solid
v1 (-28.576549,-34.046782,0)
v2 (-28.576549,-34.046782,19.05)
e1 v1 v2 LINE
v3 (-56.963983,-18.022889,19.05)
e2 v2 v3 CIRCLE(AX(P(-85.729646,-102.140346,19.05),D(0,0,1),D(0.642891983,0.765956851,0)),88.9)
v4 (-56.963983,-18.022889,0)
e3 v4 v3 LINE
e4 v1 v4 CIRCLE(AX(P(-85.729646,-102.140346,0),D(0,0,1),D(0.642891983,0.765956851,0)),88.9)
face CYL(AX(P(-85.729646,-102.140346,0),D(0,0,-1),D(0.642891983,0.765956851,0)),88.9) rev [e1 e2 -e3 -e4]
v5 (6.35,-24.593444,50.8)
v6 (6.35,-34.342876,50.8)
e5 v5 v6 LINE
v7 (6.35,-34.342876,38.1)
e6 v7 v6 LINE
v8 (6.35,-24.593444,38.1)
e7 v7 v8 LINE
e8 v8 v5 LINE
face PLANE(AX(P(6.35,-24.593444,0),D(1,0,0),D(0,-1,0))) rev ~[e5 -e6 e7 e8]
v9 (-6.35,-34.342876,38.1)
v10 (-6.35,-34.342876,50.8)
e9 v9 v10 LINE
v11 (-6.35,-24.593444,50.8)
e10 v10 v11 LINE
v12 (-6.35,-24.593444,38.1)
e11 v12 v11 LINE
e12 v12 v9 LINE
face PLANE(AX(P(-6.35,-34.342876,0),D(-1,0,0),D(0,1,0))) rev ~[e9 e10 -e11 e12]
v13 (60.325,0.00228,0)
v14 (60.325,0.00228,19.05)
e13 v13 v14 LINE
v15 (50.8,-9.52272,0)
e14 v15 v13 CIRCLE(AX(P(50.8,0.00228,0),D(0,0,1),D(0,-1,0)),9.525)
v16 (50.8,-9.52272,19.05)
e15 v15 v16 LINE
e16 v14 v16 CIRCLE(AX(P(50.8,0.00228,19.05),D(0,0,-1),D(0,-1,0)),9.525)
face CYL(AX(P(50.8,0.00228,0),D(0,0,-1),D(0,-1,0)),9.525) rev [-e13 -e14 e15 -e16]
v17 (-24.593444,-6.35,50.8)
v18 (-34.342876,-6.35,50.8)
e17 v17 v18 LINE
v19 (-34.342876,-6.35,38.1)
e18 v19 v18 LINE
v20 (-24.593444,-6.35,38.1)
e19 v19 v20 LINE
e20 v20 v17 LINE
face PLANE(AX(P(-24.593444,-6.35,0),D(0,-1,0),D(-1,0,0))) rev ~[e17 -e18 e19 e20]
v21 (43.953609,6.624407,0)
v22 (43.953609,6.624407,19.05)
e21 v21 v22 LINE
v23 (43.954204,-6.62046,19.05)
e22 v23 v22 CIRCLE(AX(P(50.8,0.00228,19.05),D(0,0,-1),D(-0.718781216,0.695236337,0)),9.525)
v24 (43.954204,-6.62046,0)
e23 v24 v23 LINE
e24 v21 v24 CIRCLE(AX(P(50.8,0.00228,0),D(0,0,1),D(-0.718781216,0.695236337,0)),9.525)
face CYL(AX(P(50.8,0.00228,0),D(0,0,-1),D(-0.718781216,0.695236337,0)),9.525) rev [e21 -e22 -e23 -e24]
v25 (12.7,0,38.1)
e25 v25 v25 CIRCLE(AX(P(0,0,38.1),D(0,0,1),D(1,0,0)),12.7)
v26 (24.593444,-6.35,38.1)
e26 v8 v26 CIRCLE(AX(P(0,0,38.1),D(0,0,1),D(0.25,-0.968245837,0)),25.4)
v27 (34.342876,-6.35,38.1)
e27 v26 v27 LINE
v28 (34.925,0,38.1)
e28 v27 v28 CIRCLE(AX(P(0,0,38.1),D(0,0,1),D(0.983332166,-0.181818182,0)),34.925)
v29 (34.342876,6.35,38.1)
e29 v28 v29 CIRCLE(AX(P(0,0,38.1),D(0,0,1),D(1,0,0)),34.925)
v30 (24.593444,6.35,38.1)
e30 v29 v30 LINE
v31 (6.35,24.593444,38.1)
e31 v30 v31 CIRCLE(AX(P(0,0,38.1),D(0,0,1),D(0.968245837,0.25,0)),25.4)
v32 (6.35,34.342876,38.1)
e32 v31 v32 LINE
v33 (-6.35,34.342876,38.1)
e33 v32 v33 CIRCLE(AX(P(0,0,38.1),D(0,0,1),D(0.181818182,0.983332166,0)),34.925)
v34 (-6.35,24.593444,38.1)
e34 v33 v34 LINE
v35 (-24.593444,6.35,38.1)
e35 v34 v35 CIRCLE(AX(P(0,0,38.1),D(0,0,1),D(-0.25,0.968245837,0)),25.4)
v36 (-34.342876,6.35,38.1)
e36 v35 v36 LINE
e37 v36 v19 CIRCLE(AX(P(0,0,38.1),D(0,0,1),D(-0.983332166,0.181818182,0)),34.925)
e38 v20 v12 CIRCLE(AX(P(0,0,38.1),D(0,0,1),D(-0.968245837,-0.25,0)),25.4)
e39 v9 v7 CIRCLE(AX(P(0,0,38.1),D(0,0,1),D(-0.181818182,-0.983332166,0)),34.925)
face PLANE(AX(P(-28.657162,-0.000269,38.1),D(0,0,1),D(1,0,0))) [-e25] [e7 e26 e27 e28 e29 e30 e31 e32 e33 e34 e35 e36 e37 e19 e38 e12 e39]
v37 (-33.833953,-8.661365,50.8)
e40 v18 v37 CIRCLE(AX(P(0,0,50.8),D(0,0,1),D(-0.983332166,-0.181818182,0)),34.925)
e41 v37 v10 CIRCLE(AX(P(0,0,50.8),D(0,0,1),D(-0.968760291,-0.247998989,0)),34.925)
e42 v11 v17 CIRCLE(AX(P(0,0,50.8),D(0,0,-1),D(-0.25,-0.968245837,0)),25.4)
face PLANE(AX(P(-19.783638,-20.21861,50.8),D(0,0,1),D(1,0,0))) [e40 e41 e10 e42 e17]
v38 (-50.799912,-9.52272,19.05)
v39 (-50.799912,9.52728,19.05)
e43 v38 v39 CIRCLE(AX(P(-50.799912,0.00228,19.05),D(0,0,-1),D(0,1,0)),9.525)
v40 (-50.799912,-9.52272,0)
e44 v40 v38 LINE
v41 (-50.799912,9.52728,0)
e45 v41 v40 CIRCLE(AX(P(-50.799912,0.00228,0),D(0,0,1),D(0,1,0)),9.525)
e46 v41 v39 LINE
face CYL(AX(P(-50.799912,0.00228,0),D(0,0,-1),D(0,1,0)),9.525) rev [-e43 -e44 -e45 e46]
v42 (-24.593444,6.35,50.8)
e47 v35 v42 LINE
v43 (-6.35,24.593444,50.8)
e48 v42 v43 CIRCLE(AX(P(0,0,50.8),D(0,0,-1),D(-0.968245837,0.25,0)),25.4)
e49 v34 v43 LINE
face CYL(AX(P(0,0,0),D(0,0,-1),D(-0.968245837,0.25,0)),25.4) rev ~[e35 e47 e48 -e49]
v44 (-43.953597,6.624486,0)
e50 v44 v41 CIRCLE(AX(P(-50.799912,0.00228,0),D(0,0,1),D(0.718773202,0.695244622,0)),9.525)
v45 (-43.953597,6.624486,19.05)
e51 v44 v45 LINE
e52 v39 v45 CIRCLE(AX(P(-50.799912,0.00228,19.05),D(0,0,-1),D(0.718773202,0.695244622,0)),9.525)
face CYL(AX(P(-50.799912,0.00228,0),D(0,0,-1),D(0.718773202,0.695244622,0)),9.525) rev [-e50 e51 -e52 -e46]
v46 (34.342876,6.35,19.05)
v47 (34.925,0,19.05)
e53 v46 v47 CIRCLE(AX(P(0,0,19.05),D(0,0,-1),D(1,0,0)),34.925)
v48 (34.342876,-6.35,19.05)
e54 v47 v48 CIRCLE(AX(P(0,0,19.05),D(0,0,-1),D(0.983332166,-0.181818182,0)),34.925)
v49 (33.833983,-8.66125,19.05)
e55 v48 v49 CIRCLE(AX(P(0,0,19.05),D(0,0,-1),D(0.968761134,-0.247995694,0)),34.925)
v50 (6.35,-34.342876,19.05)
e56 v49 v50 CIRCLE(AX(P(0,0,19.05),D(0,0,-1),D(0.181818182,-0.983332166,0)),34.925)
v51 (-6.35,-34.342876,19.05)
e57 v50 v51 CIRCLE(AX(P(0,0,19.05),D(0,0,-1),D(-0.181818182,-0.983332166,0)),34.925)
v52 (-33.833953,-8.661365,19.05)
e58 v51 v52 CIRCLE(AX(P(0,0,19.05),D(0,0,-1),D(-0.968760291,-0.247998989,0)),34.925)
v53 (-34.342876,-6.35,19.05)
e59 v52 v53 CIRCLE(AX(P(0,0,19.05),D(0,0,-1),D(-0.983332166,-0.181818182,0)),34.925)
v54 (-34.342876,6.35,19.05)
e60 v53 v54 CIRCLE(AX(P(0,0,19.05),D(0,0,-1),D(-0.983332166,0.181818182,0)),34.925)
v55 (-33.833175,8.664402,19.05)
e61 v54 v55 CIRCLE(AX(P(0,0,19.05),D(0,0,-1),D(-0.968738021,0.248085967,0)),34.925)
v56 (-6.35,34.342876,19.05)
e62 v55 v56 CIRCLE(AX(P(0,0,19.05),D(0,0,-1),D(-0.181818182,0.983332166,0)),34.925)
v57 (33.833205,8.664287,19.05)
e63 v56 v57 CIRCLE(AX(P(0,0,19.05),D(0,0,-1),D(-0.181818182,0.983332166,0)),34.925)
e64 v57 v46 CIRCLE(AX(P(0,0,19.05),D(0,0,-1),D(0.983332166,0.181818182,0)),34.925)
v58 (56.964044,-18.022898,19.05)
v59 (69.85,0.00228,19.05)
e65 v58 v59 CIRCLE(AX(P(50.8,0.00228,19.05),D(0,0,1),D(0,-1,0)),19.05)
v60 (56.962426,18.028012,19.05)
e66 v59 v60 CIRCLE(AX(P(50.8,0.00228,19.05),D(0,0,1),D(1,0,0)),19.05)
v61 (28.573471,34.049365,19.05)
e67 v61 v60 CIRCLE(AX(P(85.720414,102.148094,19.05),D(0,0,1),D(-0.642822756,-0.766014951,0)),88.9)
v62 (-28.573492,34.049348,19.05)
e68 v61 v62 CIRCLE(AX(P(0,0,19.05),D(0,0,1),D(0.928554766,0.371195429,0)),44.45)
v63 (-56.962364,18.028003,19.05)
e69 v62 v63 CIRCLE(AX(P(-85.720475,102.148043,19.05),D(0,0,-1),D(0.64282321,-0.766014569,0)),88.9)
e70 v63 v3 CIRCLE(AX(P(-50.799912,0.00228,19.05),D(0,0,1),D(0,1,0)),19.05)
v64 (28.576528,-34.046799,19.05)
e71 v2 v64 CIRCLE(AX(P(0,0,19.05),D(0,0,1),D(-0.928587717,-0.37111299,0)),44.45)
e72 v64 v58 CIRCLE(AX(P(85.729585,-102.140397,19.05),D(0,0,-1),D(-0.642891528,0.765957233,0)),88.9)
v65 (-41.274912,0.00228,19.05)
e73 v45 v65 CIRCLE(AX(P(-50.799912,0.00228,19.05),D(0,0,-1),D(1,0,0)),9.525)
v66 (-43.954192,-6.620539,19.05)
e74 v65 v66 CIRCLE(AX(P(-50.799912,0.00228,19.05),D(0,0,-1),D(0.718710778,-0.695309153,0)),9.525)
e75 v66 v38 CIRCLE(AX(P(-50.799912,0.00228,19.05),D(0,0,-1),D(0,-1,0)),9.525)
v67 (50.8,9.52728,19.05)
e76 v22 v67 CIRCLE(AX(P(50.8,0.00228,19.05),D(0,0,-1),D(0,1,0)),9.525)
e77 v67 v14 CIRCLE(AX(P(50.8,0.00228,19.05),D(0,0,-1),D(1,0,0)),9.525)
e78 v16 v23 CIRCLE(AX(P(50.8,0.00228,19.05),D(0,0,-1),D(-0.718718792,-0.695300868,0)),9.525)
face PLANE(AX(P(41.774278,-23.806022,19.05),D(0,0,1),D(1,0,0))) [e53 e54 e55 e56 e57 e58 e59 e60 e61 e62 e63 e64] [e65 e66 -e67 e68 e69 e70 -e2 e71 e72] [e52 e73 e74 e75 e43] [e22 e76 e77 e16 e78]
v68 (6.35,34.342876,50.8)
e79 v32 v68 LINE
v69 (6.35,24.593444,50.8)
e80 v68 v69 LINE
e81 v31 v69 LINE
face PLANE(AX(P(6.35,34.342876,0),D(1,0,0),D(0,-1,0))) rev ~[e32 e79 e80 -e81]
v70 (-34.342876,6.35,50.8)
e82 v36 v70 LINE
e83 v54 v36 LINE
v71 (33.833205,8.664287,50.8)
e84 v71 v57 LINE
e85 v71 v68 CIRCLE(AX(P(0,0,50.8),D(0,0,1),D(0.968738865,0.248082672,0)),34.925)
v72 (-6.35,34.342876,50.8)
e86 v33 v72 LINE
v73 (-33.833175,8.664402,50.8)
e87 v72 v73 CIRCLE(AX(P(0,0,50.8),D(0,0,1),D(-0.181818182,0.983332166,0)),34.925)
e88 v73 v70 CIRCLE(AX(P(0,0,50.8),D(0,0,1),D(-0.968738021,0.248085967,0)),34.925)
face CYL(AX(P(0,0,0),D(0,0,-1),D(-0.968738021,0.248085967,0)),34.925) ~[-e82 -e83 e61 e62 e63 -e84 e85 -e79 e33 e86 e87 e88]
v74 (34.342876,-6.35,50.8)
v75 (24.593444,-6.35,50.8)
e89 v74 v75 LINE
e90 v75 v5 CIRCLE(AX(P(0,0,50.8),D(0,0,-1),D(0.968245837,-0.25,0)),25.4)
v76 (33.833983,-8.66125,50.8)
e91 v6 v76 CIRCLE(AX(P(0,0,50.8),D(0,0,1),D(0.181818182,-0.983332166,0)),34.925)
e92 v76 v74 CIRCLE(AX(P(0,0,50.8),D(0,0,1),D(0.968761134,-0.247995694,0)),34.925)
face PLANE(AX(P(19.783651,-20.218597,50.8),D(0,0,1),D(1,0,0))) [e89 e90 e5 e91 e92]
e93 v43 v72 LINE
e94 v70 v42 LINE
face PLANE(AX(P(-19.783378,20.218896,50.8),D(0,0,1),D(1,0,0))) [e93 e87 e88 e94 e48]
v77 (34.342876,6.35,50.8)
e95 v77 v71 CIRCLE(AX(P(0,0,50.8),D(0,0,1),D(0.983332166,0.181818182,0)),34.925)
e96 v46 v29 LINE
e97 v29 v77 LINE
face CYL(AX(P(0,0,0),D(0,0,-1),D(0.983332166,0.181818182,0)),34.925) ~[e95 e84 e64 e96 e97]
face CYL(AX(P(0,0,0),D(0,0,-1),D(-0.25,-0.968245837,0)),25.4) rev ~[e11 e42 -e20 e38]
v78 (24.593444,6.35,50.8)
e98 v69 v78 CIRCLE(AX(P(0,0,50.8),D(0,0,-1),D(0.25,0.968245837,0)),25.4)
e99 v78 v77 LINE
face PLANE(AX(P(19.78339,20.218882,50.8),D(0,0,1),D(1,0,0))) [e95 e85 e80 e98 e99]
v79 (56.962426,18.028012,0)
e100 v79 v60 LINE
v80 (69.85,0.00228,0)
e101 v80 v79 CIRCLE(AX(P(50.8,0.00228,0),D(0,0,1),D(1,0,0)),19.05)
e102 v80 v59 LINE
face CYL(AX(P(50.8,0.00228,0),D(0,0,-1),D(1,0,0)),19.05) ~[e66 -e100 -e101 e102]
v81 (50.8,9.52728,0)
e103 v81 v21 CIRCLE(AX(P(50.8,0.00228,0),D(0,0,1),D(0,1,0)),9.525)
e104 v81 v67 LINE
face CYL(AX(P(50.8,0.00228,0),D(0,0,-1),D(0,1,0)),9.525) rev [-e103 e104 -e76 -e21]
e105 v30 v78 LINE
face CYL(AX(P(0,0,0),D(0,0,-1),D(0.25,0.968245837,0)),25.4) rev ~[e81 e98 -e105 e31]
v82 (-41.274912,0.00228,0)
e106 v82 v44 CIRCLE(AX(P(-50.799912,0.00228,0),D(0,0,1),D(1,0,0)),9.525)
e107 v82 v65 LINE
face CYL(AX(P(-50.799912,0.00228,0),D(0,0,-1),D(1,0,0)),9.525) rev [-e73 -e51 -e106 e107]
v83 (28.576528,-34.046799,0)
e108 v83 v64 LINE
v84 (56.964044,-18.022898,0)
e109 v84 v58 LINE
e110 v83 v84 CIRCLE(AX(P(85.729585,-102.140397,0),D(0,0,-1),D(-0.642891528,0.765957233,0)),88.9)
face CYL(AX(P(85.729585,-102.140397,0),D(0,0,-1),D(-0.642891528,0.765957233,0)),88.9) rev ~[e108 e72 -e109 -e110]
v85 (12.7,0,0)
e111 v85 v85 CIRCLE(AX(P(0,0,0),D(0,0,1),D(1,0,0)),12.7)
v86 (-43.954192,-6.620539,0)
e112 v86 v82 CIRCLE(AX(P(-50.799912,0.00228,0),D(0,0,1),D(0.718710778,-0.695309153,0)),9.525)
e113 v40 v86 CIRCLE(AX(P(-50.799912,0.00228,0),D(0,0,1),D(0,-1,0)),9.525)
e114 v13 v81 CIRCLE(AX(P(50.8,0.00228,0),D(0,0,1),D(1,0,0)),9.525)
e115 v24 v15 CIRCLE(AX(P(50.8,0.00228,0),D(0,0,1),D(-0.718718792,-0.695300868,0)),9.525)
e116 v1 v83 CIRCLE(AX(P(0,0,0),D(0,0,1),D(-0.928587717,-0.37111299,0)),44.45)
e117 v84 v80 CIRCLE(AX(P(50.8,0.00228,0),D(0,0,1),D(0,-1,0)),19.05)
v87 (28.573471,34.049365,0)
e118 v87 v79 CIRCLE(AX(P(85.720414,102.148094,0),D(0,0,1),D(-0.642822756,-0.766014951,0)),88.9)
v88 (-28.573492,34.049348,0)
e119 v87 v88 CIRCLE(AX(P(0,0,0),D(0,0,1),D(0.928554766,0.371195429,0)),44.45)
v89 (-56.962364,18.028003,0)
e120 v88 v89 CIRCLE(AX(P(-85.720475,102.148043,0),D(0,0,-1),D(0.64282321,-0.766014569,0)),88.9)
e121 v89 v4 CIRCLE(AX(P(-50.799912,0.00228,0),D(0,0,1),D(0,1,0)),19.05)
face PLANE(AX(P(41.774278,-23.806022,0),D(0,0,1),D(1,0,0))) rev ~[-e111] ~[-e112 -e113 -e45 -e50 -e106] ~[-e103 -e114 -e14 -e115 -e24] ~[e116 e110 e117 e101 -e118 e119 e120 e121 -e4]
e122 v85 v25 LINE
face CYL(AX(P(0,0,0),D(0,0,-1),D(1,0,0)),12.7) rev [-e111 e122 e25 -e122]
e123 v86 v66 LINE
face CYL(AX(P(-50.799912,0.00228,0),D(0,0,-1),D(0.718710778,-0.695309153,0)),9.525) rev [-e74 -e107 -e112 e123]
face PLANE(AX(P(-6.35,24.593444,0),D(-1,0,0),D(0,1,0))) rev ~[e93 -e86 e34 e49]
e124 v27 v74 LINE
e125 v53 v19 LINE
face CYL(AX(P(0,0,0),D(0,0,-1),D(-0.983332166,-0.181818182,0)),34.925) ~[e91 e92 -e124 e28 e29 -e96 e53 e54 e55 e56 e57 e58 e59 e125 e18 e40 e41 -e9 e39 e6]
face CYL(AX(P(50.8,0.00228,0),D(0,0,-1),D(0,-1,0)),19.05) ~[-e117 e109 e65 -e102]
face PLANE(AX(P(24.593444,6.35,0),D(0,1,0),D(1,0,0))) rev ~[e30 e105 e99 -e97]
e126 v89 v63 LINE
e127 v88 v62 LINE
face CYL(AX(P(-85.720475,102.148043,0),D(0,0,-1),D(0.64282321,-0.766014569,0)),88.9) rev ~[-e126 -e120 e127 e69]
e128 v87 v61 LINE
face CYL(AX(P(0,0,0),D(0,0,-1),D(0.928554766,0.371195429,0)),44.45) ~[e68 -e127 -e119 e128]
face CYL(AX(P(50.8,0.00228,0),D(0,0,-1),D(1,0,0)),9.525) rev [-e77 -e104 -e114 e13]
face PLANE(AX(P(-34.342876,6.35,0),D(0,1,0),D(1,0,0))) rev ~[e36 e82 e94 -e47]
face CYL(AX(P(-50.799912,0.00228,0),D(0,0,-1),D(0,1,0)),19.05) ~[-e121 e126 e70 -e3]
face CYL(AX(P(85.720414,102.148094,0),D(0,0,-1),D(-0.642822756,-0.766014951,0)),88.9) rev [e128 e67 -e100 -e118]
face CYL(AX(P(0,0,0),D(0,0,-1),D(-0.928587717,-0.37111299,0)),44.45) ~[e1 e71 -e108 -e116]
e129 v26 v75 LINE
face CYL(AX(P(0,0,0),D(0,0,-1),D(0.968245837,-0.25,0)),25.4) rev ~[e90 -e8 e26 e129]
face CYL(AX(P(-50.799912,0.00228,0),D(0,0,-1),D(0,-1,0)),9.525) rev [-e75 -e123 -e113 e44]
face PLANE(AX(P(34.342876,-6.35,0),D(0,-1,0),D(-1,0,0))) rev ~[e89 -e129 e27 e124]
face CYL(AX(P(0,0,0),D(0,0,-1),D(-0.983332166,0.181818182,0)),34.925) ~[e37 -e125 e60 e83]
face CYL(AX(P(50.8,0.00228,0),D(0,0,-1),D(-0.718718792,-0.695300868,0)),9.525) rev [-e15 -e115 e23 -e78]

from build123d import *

# Parameters (mm, degrees)
F0_R        = 12.7
F1_DEPTH    = 19.05
F2_DEPTH    = 38.1
F3_DEPTH    = 50.8
F4_T1_DEPTH = 19.05
F5_DEPTH    = 25.4


# Not quite as in the source:
# - a fillet or chamfer that OpenCascade refuses, or shapes differently, is made with other operations: its cross-section is extruded or revolved along the edge and cut away or added


with BuildPart() as f1:
    # F0 (on Top) → F1 (new body)
    with BuildSketch(Plane.XY):
        with BuildLine():
            ThreePointArc((-50.7999117786, -19.0477195084), (-45.869861945, -18.3987278677), (-41.2757240411, -16.4959723838))
            ThreePointArc((-41.2757240411, -16.4959723838), (-42.9000661545, -11.6355843833), (-43.9541916189, -6.620539187))
            ThreePointArc((-43.9541916189, -6.620539187), (-47.0821659857, -8.7672115815), (-50.7999117786, -9.5227195084))
            Line((-50.7999117786, -9.5227195084), (-50.7999117786, -19.0477195084))
        make_face()
        with BuildLine():
            ThreePointArc((33.8339826183, -8.661249632), (23.8448022993, -25.5182489271), (6.35, -34.3428758988))
            ThreePointArc((6.35, -34.3428758988), (0, -34.925), (-6.35, -34.3428758988))
            ThreePointArc((-6.35, -34.3428758988), (-23.8447589032, -25.5182894774), (-33.8339531596, -8.6613647075))
            ThreePointArc((-33.8339531596, -8.6613647075), (-36.9876986012, -13.1173714527), (-41.2757240411, -16.4959723838))
            ThreePointArc((-41.2757240411, -16.4959723838), (2.22821e-05, -44.45), (41.2757405794, -16.495931002))
            ThreePointArc((41.2757405794, -16.495931002), (36.9877138276, -13.1172946041), (33.8339826183, -8.661249632))
        make_face()
        with BuildLine():
            ThreePointArc((6.35, 24.5934442484), (17.9605122421, 17.9605122421), (24.5934442484, 6.35))
            Line((24.5934442484, 6.35), (32.8386816452, 6.35))
            ThreePointArc((32.8386816452, 6.35), (33.2976498796, 7.5235995423), (33.8332048478, 8.6642873181))
            ThreePointArc((33.8332048478, 8.6642873181), (23.8436567211, 25.519319332), (6.35, 34.3428758988))
            Line((6.35, 34.3428758988), (6.35, 24.5934442484))
        make_face()
        with BuildLine():
            ThreePointArc((50.8, 19.0522804916), (45.8690841465, 18.4030568025), (41.2742593566, 16.4996368009))
            ThreePointArc((41.2742593566, 16.4996368009), (42.8990375845, 11.6393760281), (43.9536089212, 6.6244066))
            ThreePointArc((43.9536089212, 6.6244066), (47.0818099956, 8.771584232), (50.8, 9.5272804916))
            Line((50.8, 9.5272804916), (50.8, 19.0522804916))
        make_face()
        with BuildLine():
            ThreePointArc((-43.953597028, 6.6244855122), (-42.8990213005, 11.6394360455), (-41.274242812, 16.4996781876))
            ThreePointArc((-41.274242812, 16.4996781876), (-45.8690358984, 18.4030675143), (-50.7999117786, 19.0522804916))
            Line((-50.7999117786, 19.0522804916), (-50.7999117786, 9.5272804916))
            ThreePointArc((-50.7999117786, 9.5272804916), (-47.0817723125, 8.7716056601), (-43.953597028, 6.6244855122))
        make_face()
        with BuildLine():
            ThreePointArc((-24.5934442484, -6.35), (-25.4, 0), (-24.5934442484, 6.35))
            Line((-24.5934442484, 6.35), (-32.8385934238, 6.35))
            ThreePointArc((-32.8385934238, 6.35), (-32.0240547455, 3.2224812106), (-31.7499117786, 0.0022804916))
            ThreePointArc((-31.7499117786, 0.0022804916), (-32.0244637739, -3.2203042194), (-32.8402059749, -6.35))
            Line((-32.8402059749, -6.35), (-24.5934442484, -6.35))
        make_face()
        with BuildLine():
            ThreePointArc((-34.3428758988, 6.35), (-34.1076619913, 7.5115257095), (-33.8331753774, 8.6644023962))
            ThreePointArc((-33.8331753774, 8.6644023962), (-36.9865207313, 13.1206922771), (-41.274242812, 16.4996781876))
            ThreePointArc((-41.274242812, 16.4996781876), (-42.8990213005, 11.6394360455), (-43.953597028, 6.6244855122))
            ThreePointArc((-43.953597028, 6.6244855122), (-41.9699408557, 3.5740081548), (-41.2749117786, 0.0022804916))
            ThreePointArc((-41.2749117786, 0.0022804916), (-41.9701012053, -3.5698435599), (-43.9541916189, -6.620539187))
            ThreePointArc((-43.9541916189, -6.620539187), (-42.9000661545, -11.6355843833), (-41.2757240411, -16.4959723838))
            ThreePointArc((-41.2757240411, -16.4959723838), (-36.9876986012, -13.1173714527), (-33.8339531596, -8.6613647075))
            ThreePointArc((-33.8339531596, -8.6613647075), (-34.1079991617, -7.5099945529), (-34.3428758988, -6.35))
            ThreePointArc((-34.3428758988, -6.35), (-34.925, 0), (-34.3428758988, 6.35))
        make_face()
        with BuildLine():
            ThreePointArc((-43.9541916189, -6.620539187), (-44.4499999552, 0.0019954336), (-43.953597028, 6.6244855122))
            ThreePointArc((-43.953597028, 6.6244855122), (-47.0817723125, 8.7716056601), (-50.7999117786, 9.5272804916))
            Line((-50.7999117786, 9.5272804916), (-50.7999117786, -9.5227195084))
            ThreePointArc((-50.7999117786, -9.5227195084), (-47.0821659857, -8.7672115815), (-43.9541916189, -6.620539187))
        make_face()
        with BuildLine():
            ThreePointArc((-41.2749117786, 0.0022804916), (-41.9699408557, 3.5740081548), (-43.953597028, 6.6244855122))
            ThreePointArc((-43.953597028, 6.6244855122), (-44.4499999552, 0.0019954336), (-43.9541916189, -6.620539187))
            ThreePointArc((-43.9541916189, -6.620539187), (-41.9701012053, -3.5698435599), (-41.2749117786, 0.0022804916))
        make_face()
        with BuildLine():
            Line((34.3428758988, 6.35), (32.8386816452, 6.35))
            ThreePointArc((32.8386816452, 6.35), (31.7500001536, -0.000138335), (32.8402941963, -6.35))
            Line((32.8402941963, -6.35), (34.3428758988, -6.35))
            ThreePointArc((34.3428758988, -6.35), (34.7791644937, -3.1883133656), (34.925, 0))
            ThreePointArc((34.925, 0), (34.7791644937, 3.1883133656), (34.3428758988, 6.35))
        make_face()
        with BuildLine():
            ThreePointArc((24.5934442484, -6.35), (25.1975542852, -3.2005090291), (25.4, 0))
            ThreePointArc((25.4, 0), (25.1975542852, 3.2005090291), (24.5934442484, 6.35))
            ThreePointArc((24.5934442484, 6.35), (17.9605122421, 17.9605122421), (6.35, 24.5934442484))
            ThreePointArc((6.35, 24.5934442484), (0, 25.4), (-6.35, 24.5934442484))
            ThreePointArc((-6.35, 24.5934442484), (-17.9605122421, 17.9605122421), (-24.5934442484, 6.35))
            ThreePointArc((-24.5934442484, 6.35), (-25.4, 0), (-24.5934442484, -6.35))
            ThreePointArc((-24.5934442484, -6.35), (-17.9605122421, -17.9605122421), (-6.35, -24.5934442484))
            ThreePointArc((-6.35, -24.5934442484), (0, -25.4), (6.35, -24.5934442484))
            ThreePointArc((6.35, -24.5934442484), (17.9605122421, -17.9605122421), (24.5934442484, -6.35))
        make_face()
        Circle(F0_R, mode=Mode.SUBTRACT)
        with BuildLine():
            Line((6.35, -34.3428758988), (6.35, -24.5934442484))
            ThreePointArc((6.35, -24.5934442484), (0, -25.4), (-6.35, -24.5934442484))
            Line((-6.35, -24.5934442484), (-6.35, -34.3428758988))
            ThreePointArc((-6.35, -34.3428758988), (0, -34.925), (6.35, -34.3428758988))
        make_face()
        with BuildLine():
            ThreePointArc((-6.35, 24.5934442484), (0, 25.4), (6.35, 24.5934442484))
            Line((6.35, 24.5934442484), (6.35, 34.3428758988))
            ThreePointArc((6.35, 34.3428758988), (0, 34.925), (-6.35, 34.3428758988))
            Line((-6.35, 34.3428758988), (-6.35, 24.5934442484))
        make_face()
        with BuildLine():
            ThreePointArc((69.85, 0.0022804916), (64.2703841816, 13.4726646732), (50.8, 19.0522804916))
            Line((50.8, 19.0522804916), (50.8, 9.5272804916))
            ThreePointArc((50.8, 9.5272804916), (57.5351920908, 6.7374725824), (60.325, 0.0022804916))
            ThreePointArc((60.325, 0.0022804916), (57.5351920908, -6.7329115992), (50.8, -9.5227195084))
            Line((50.8, -9.5227195084), (50.8, -19.0477195084))
            ThreePointArc((50.8, -19.0477195084), (64.2703841816, -13.46810369), (69.85, 0.0022804916))
        make_face()
        with BuildLine():
            ThreePointArc((-24.5934442484, 6.35), (-17.9605122421, 17.9605122421), (-6.35, 24.5934442484))
            Line((-6.35, 24.5934442484), (-6.35, 34.3428758988))
            ThreePointArc((-6.35, 34.3428758988), (-23.8436133211, 25.5193598821), (-33.8331753774, 8.6644023962))
            ThreePointArc((-33.8331753774, 8.6644023962), (-33.2975871652, 7.5236588976), (-32.8385934238, 6.35))
            Line((-32.8385934238, 6.35), (-24.5934442484, 6.35))
        make_face()
        with BuildLine():
            Line((-6.35, -34.3428758988), (-6.35, -24.5934442484))
            ThreePointArc((-6.35, -24.5934442484), (-17.9605122421, -17.9605122421), (-24.5934442484, -6.35))
            Line((-24.5934442484, -6.35), (-32.8402059749, -6.35))
            ThreePointArc((-32.8402059749, -6.35), (-33.2988800792, -7.5221058258), (-33.8339531596, -8.6613647075))
            ThreePointArc((-33.8339531596, -8.6613647075), (-23.8447589032, -25.5182894774), (-6.35, -34.3428758988))
        make_face()
        with BuildLine():
            Line((-50.7999117786, -9.5227195084), (-50.7999117786, 9.5272804916))
            ThreePointArc((-50.7999117786, 9.5272804916), (-60.3249117786, 0.0022804916), (-50.7999117786, -9.5227195084))
        make_face()
        with BuildLine():
            Line((-50.7999117786, 9.5272804916), (-50.7999117786, 19.0522804916))
            ThreePointArc((-50.7999117786, 19.0522804916), (-69.8499117786, 0.0022804916), (-50.7999117786, -19.0477195084))
            Line((-50.7999117786, -19.0477195084), (-50.7999117786, -9.5227195084))
            ThreePointArc((-50.7999117786, -9.5227195084), (-60.3249117786, 0.0022804916), (-50.7999117786, 9.5272804916))
        make_face()
        with BuildLine():
            ThreePointArc((-31.7499117786, 0.0022804916), (-32.0240547455, 3.2224812106), (-32.8385934238, 6.35))
            Line((-32.8385934238, 6.35), (-34.3428758988, 6.35))
            ThreePointArc((-34.3428758988, 6.35), (-34.925, 0), (-34.3428758988, -6.35))
            Line((-34.3428758988, -6.35), (-32.8402059749, -6.35))
            ThreePointArc((-32.8402059749, -6.35), (-32.0244637739, -3.2203042194), (-31.7499117786, 0.0022804916))
        make_face()
        with BuildLine():
            ThreePointArc((44.45, 0), (44.3257285137, 3.3214893838), (43.9536089212, 6.6244066))
            ThreePointArc((43.9536089212, 6.6244066), (41.2750000096, 0.0018528994), (43.954203504, -6.6204602806))
            ThreePointArc((43.954203504, -6.6204602806), (44.3258775759, -3.319499529), (44.45, 0))
        make_face()
        with BuildLine():
            ThreePointArc((-6.35, 34.3428758988), (0, 34.925), (6.35, 34.3428758988))
            ThreePointArc((6.35, 34.3428758988), (23.8436567211, 25.519319332), (33.8332048478, 8.6642873181))
            ThreePointArc((33.8332048478, 8.6642873181), (36.9865359667, 13.1206154241), (41.2742593566, 16.4996368009))
            ThreePointArc((41.2742593566, 16.4996368009), (2.22855e-05, 44.45), (-41.274242812, 16.4996781876))
            ThreePointArc((-41.274242812, 16.4996781876), (-36.9865207313, 13.1206922771), (-33.8331753774, 8.6644023962))
            ThreePointArc((-33.8331753774, 8.6644023962), (-23.8436133211, 25.5193598821), (-6.35, 34.3428758988))
        make_face()
        with BuildLine():
            ThreePointArc((50.8, 9.5272804916), (47.0818099956, 8.771584232), (43.9536089212, 6.6244066))
            ThreePointArc((43.9536089212, 6.6244066), (44.3257285137, 3.3214893838), (44.45, 0))
            ThreePointArc((44.45, 0), (44.3258775759, -3.319499529), (43.954203504, -6.6204602806))
            ThreePointArc((43.954203504, -6.6204602806), (47.0822036672, -8.7671901554), (50.8, -9.5227195084))
            Line((50.8, -9.5227195084), (50.8, 9.5272804916))
        make_face()
        with BuildLine():
            ThreePointArc((60.325, 0.0022804916), (57.5351920908, 6.7374725824), (50.8, 9.5272804916))
            Line((50.8, 9.5272804916), (50.8, -9.5227195084))
            ThreePointArc((50.8, -9.5227195084), (57.5351920908, -6.7329115992), (60.325, 0.0022804916))
        make_face()
        with BuildLine():
            ThreePointArc((43.954203504, -6.6204602806), (42.9000824312, -11.6355243712), (41.2757405794, -16.495931002))
            ThreePointArc((41.2757405794, -16.495931002), (45.8699101912, -18.3987171574), (50.8, -19.0477195084))
            Line((50.8, -19.0477195084), (50.8, -9.5227195084))
            ThreePointArc((50.8, -9.5227195084), (47.0822036672, -8.7671901554), (43.954203504, -6.6204602806))
        make_face()
        with BuildLine():
            ThreePointArc((24.5934442484, 6.35), (25.1975542852, 3.2005090291), (25.4, 0))
            ThreePointArc((25.4, 0), (25.1975542852, -3.2005090291), (24.5934442484, -6.35))
            Line((24.5934442484, -6.35), (32.8402941963, -6.35))
            ThreePointArc((32.8402941963, -6.35), (31.7500001536, -0.000138335), (32.8386816452, 6.35))
            Line((32.8386816452, 6.35), (24.5934442484, 6.35))
        make_face()
        with BuildLine():
            ThreePointArc((33.8332048478, 8.6642873181), (34.1076747659, 7.5114677036), (34.3428758988, 6.35))
            ThreePointArc((34.3428758988, 6.35), (34.7791644937, 3.1883133656), (34.925, 0))
            ThreePointArc((34.925, 0), (34.7791644937, -3.1883133656), (34.3428758988, -6.35))
            ThreePointArc((34.3428758988, -6.35), (34.1080119331, -7.5099365491), (33.8339826183, -8.661249632))
            ThreePointArc((33.8339826183, -8.661249632), (36.9877138276, -13.1172946041), (41.2757405794, -16.495931002))
            ThreePointArc((41.2757405794, -16.495931002), (42.9000824312, -11.6355243712), (43.954203504, -6.6204602806))
            ThreePointArc((43.954203504, -6.6204602806), (41.2750000096, 0.0018528994), (43.9536089212, 6.6244066))
            ThreePointArc((43.9536089212, 6.6244066), (42.8990375845, 11.6393760281), (41.2742593566, 16.4996368009))
            ThreePointArc((41.2742593566, 16.4996368009), (36.9865359667, 13.1206154241), (33.8332048478, 8.6642873181))
        make_face()
        with BuildLine():
            Line((32.8402941963, -6.35), (24.5934442484, -6.35))
            ThreePointArc((24.5934442484, -6.35), (17.9605122421, -17.9605122421), (6.35, -24.5934442484))
            Line((6.35, -24.5934442484), (6.35, -34.3428758988))
            ThreePointArc((6.35, -34.3428758988), (23.8448022993, -25.5182489271), (33.8339826183, -8.661249632))
            ThreePointArc((33.8339826183, -8.661249632), (33.2989427827, -7.5220464735), (32.8402941963, -6.35))
        make_face()
        with BuildLine():
            ThreePointArc((-33.8339531596, -8.6613647075), (-33.2988800792, -7.5221058258), (-32.8402059749, -6.35))
            Line((-32.8402059749, -6.35), (-34.3428758988, -6.35))
            ThreePointArc((-34.3428758988, -6.35), (-34.1079991617, -7.5099945529), (-33.8339531596, -8.6613647075))
        make_face()
        with BuildLine():
            ThreePointArc((33.8332048478, 8.6642873181), (33.2976498796, 7.5235995423), (32.8386816452, 6.35))
            Line((32.8386816452, 6.35), (34.3428758988, 6.35))
            ThreePointArc((34.3428758988, 6.35), (34.1076747659, 7.5114677036), (33.8332048478, 8.6642873181))
        make_face()
        with BuildLine():
            Line((34.3428758988, -6.35), (32.8402941963, -6.35))
            ThreePointArc((32.8402941963, -6.35), (33.2989427827, -7.5220464735), (33.8339826183, -8.661249632))
            ThreePointArc((33.8339826183, -8.661249632), (34.1080119331, -7.5099365491), (34.3428758988, -6.35))
        make_face()
        with BuildLine():
            Line((-34.3428758988, 6.35), (-32.8385934238, 6.35))
            ThreePointArc((-32.8385934238, 6.35), (-33.2975871652, 7.5236588976), (-33.8331753774, 8.6644023962))
            ThreePointArc((-33.8331753774, 8.6644023962), (-34.1076619913, 7.5115257095), (-34.3428758988, 6.35))
        make_face()
    extrude(amount=F1_DEPTH)

    # F0 (on Top) → F2 (join)
    with BuildSketch(Plane.XY):
        with BuildLine():
            ThreePointArc((-24.5934442484, -6.35), (-25.4, 0), (-24.5934442484, 6.35))
            Line((-24.5934442484, 6.35), (-32.8385934238, 6.35))
            ThreePointArc((-32.8385934238, 6.35), (-32.0240547455, 3.2224812106), (-31.7499117786, 0.0022804916))
            ThreePointArc((-31.7499117786, 0.0022804916), (-32.0244637739, -3.2203042194), (-32.8402059749, -6.35))
            Line((-32.8402059749, -6.35), (-24.5934442484, -6.35))
        make_face()
        with BuildLine():
            ThreePointArc((-31.7499117786, 0.0022804916), (-32.0240547455, 3.2224812106), (-32.8385934238, 6.35))
            Line((-32.8385934238, 6.35), (-34.3428758988, 6.35))
            ThreePointArc((-34.3428758988, 6.35), (-34.925, 0), (-34.3428758988, -6.35))
            Line((-34.3428758988, -6.35), (-32.8402059749, -6.35))
            ThreePointArc((-32.8402059749, -6.35), (-32.0244637739, -3.2203042194), (-31.7499117786, 0.0022804916))
        make_face()
        with BuildLine():
            Line((6.35, -34.3428758988), (6.35, -24.5934442484))
            ThreePointArc((6.35, -24.5934442484), (0, -25.4), (-6.35, -24.5934442484))
            Line((-6.35, -24.5934442484), (-6.35, -34.3428758988))
            ThreePointArc((-6.35, -34.3428758988), (0, -34.925), (6.35, -34.3428758988))
        make_face()
        with BuildLine():
            ThreePointArc((-6.35, 24.5934442484), (0, 25.4), (6.35, 24.5934442484))
            Line((6.35, 24.5934442484), (6.35, 34.3428758988))
            ThreePointArc((6.35, 34.3428758988), (0, 34.925), (-6.35, 34.3428758988))
            Line((-6.35, 34.3428758988), (-6.35, 24.5934442484))
        make_face()
        with BuildLine():
            ThreePointArc((24.5934442484, 6.35), (25.1975542852, 3.2005090291), (25.4, 0))
            ThreePointArc((25.4, 0), (25.1975542852, -3.2005090291), (24.5934442484, -6.35))
            Line((24.5934442484, -6.35), (32.8402941963, -6.35))
            ThreePointArc((32.8402941963, -6.35), (31.7500001536, -0.000138335), (32.8386816452, 6.35))
            Line((32.8386816452, 6.35), (24.5934442484, 6.35))
        make_face()
        with BuildLine():
            Line((34.3428758988, 6.35), (32.8386816452, 6.35))
            ThreePointArc((32.8386816452, 6.35), (31.7500001536, -0.000138335), (32.8402941963, -6.35))
            Line((32.8402941963, -6.35), (34.3428758988, -6.35))
            ThreePointArc((34.3428758988, -6.35), (34.7791644937, -3.1883133656), (34.925, 0))
            ThreePointArc((34.925, 0), (34.7791644937, 3.1883133656), (34.3428758988, 6.35))
        make_face()
        with BuildLine():
            ThreePointArc((24.5934442484, -6.35), (25.1975542852, -3.2005090291), (25.4, 0))
            ThreePointArc((25.4, 0), (25.1975542852, 3.2005090291), (24.5934442484, 6.35))
            ThreePointArc((24.5934442484, 6.35), (17.9605122421, 17.9605122421), (6.35, 24.5934442484))
            ThreePointArc((6.35, 24.5934442484), (0, 25.4), (-6.35, 24.5934442484))
            ThreePointArc((-6.35, 24.5934442484), (-17.9605122421, 17.9605122421), (-24.5934442484, 6.35))
            ThreePointArc((-24.5934442484, 6.35), (-25.4, 0), (-24.5934442484, -6.35))
            ThreePointArc((-24.5934442484, -6.35), (-17.9605122421, -17.9605122421), (-6.35, -24.5934442484))
            ThreePointArc((-6.35, -24.5934442484), (0, -25.4), (6.35, -24.5934442484))
            ThreePointArc((6.35, -24.5934442484), (17.9605122421, -17.9605122421), (24.5934442484, -6.35))
        make_face()
        Circle(F0_R, mode=Mode.SUBTRACT)
        with BuildLine():
            ThreePointArc((33.8332048478, 8.6642873181), (33.2976498796, 7.5235995423), (32.8386816452, 6.35))
            Line((32.8386816452, 6.35), (34.3428758988, 6.35))
            ThreePointArc((34.3428758988, 6.35), (34.1076747659, 7.5114677036), (33.8332048478, 8.6642873181))
        make_face()
        with BuildLine():
            Line((34.3428758988, -6.35), (32.8402941963, -6.35))
            ThreePointArc((32.8402941963, -6.35), (33.2989427827, -7.5220464735), (33.8339826183, -8.661249632))
            ThreePointArc((33.8339826183, -8.661249632), (34.1080119331, -7.5099365491), (34.3428758988, -6.35))
        make_face()
        with BuildLine():
            ThreePointArc((-33.8339531596, -8.6613647075), (-33.2988800792, -7.5221058258), (-32.8402059749, -6.35))
            Line((-32.8402059749, -6.35), (-34.3428758988, -6.35))
            ThreePointArc((-34.3428758988, -6.35), (-34.1079991617, -7.5099945529), (-33.8339531596, -8.6613647075))
        make_face()
        with BuildLine():
            Line((-34.3428758988, 6.35), (-32.8385934238, 6.35))
            ThreePointArc((-32.8385934238, 6.35), (-33.2975871652, 7.5236588976), (-33.8331753774, 8.6644023962))
            ThreePointArc((-33.8331753774, 8.6644023962), (-34.1076619913, 7.5115257095), (-34.3428758988, 6.35))
        make_face()
    extrude(amount=F2_DEPTH)

    # F0 (on Top) → F3 (join)
    with BuildSketch(Plane.XY):
        with BuildLine():
            Line((-6.35, -34.3428758988), (-6.35, -24.5934442484))
            ThreePointArc((-6.35, -24.5934442484), (-17.9605122421, -17.9605122421), (-24.5934442484, -6.35))
            Line((-24.5934442484, -6.35), (-32.8402059749, -6.35))
            ThreePointArc((-32.8402059749, -6.35), (-33.2988800792, -7.5221058258), (-33.8339531596, -8.6613647075))
            ThreePointArc((-33.8339531596, -8.6613647075), (-23.8447589032, -25.5182894774), (-6.35, -34.3428758988))
        make_face()
        with BuildLine():
            Line((32.8402941963, -6.35), (24.5934442484, -6.35))
            ThreePointArc((24.5934442484, -6.35), (17.9605122421, -17.9605122421), (6.35, -24.5934442484))
            Line((6.35, -24.5934442484), (6.35, -34.3428758988))
            ThreePointArc((6.35, -34.3428758988), (23.8448022993, -25.5182489271), (33.8339826183, -8.661249632))
            ThreePointArc((33.8339826183, -8.661249632), (33.2989427827, -7.5220464735), (32.8402941963, -6.35))
        make_face()
        with BuildLine():
            ThreePointArc((6.35, 24.5934442484), (17.9605122421, 17.9605122421), (24.5934442484, 6.35))
            Line((24.5934442484, 6.35), (32.8386816452, 6.35))
            ThreePointArc((32.8386816452, 6.35), (33.2976498796, 7.5235995423), (33.8332048478, 8.6642873181))
            ThreePointArc((33.8332048478, 8.6642873181), (23.8436567211, 25.519319332), (6.35, 34.3428758988))
            Line((6.35, 34.3428758988), (6.35, 24.5934442484))
        make_face()
        with BuildLine():
            ThreePointArc((-24.5934442484, 6.35), (-17.9605122421, 17.9605122421), (-6.35, 24.5934442484))
            Line((-6.35, 24.5934442484), (-6.35, 34.3428758988))
            ThreePointArc((-6.35, 34.3428758988), (-23.8436133211, 25.5193598821), (-33.8331753774, 8.6644023962))
            ThreePointArc((-33.8331753774, 8.6644023962), (-33.2975871652, 7.5236588976), (-32.8385934238, 6.35))
            Line((-32.8385934238, 6.35), (-24.5934442484, 6.35))
        make_face()
        with BuildLine():
            ThreePointArc((-33.8339531596, -8.6613647075), (-33.2988800792, -7.5221058258), (-32.8402059749, -6.35))
            Line((-32.8402059749, -6.35), (-34.3428758988, -6.35))
            ThreePointArc((-34.3428758988, -6.35), (-34.1079991617, -7.5099945529), (-33.8339531596, -8.6613647075))
        make_face()
        with BuildLine():
            Line((-34.3428758988, 6.35), (-32.8385934238, 6.35))
            ThreePointArc((-32.8385934238, 6.35), (-33.2975871652, 7.5236588976), (-33.8331753774, 8.6644023962))
            ThreePointArc((-33.8331753774, 8.6644023962), (-34.1076619913, 7.5115257095), (-34.3428758988, 6.35))
        make_face()
        with BuildLine():
            Line((34.3428758988, -6.35), (32.8402941963, -6.35))
            ThreePointArc((32.8402941963, -6.35), (33.2989427827, -7.5220464735), (33.8339826183, -8.661249632))
            ThreePointArc((33.8339826183, -8.661249632), (34.1080119331, -7.5099365491), (34.3428758988, -6.35))
        make_face()
        with BuildLine():
            ThreePointArc((33.8332048478, 8.6642873181), (33.2976498796, 7.5235995423), (32.8386816452, 6.35))
            Line((32.8386816452, 6.35), (34.3428758988, 6.35))
            ThreePointArc((34.3428758988, 6.35), (34.1076747659, 7.5114677036), (33.8332048478, 8.6642873181))
        make_face()
    extrude(amount=F3_DEPTH)

    # F4: fillet of radius 88.9 on 4 edges, made by hand

    # F4_s2 → F4_t1 (join)
    with BuildSketch(Plane.XY):
        with BuildLine():
            ThreePointArc((28.5765284312, -34.0467990099), (42.0295542971, -24.722587122), (56.9640444636, -18.0228978945))
            ThreePointArc((56.9640444636, -18.0228978945), (48.9545547659, -18.958121189), (41.2757405794, -16.495931002))
            ThreePointArc((41.2757405794, -16.495931002), (36.011708005, -26.0568491296), (28.5765284312, -34.0467990099))
        make_face()
        with BuildLine():
            ThreePointArc((28.5734714877, 34.0493645629), (42.0273344564, 24.7263605674), (56.9624260817, 18.0280122323))
            ThreePointArc((56.9624260817, 18.0280122323), (48.9528524491, 18.9625164059), (41.2742593566, 16.4996368009))
            ThreePointArc((41.2742593566, 16.4996368009), (36.0093683943, 26.0600822685), (28.5734714877, 34.0493645629))
        make_face()
        with BuildLine():
            ThreePointArc((-28.5734917033, 34.0493475985), (-42.0273157024, 24.726354484), (-56.9623641312, 18.0280032511))
            ThreePointArc((-56.9623641312, 18.0280032511), (-48.9528192327, 18.9625217645), (-41.274242812, 16.4996781876))
            ThreePointArc((-41.274242812, 16.4996781876), (-36.0093630649, 26.0600896326), (-28.5734917033, 34.0493475985))
        make_face()
        with BuildLine():
            ThreePointArc((-28.5765486506, -34.0467820392), (-42.0295355464, -24.7225810337), (-56.9639825151, -18.02288891))
            ThreePointArc((-56.9639825151, -18.02288891), (-48.954521553, -18.9581265429), (-41.2757240411, -16.4959723838))
            ThreePointArc((-41.2757240411, -16.4959723838), (-36.0117026803, -26.0568564885), (-28.5765486506, -34.0467820392))
        make_face()
    extrude(amount=F4_T1_DEPTH)

    # F0 (on Top) → F5 (cut)
    with BuildSketch(Plane.XY):
        with BuildLine():
            ThreePointArc((-43.9541916189, -6.620539187), (-44.4499999552, 0.0019954336), (-43.953597028, 6.6244855122))
            ThreePointArc((-43.953597028, 6.6244855122), (-47.0817723125, 8.7716056601), (-50.7999117786, 9.5272804916))
            Line((-50.7999117786, 9.5272804916), (-50.7999117786, -9.5227195084))
            ThreePointArc((-50.7999117786, -9.5227195084), (-47.0821659857, -8.7672115815), (-43.9541916189, -6.620539187))
        make_face()
        with BuildLine():
            ThreePointArc((-41.2749117786, 0.0022804916), (-41.9699408557, 3.5740081548), (-43.953597028, 6.6244855122))
            ThreePointArc((-43.953597028, 6.6244855122), (-44.4499999552, 0.0019954336), (-43.9541916189, -6.620539187))
            ThreePointArc((-43.9541916189, -6.620539187), (-41.9701012053, -3.5698435599), (-41.2749117786, 0.0022804916))
        make_face()
        with BuildLine():
            Line((-50.7999117786, -9.5227195084), (-50.7999117786, 9.5272804916))
            ThreePointArc((-50.7999117786, 9.5272804916), (-60.3249117786, 0.0022804916), (-50.7999117786, -9.5227195084))
        make_face()
        with BuildLine():
            ThreePointArc((44.45, 0), (44.3257285137, 3.3214893838), (43.9536089212, 6.6244066))
            ThreePointArc((43.9536089212, 6.6244066), (41.2750000096, 0.0018528994), (43.954203504, -6.6204602806))
            ThreePointArc((43.954203504, -6.6204602806), (44.3258775759, -3.319499529), (44.45, 0))
        make_face()
        with BuildLine():
            ThreePointArc((50.8, 9.5272804916), (47.0818099956, 8.771584232), (43.9536089212, 6.6244066))
            ThreePointArc((43.9536089212, 6.6244066), (44.3257285137, 3.3214893838), (44.45, 0))
            ThreePointArc((44.45, 0), (44.3258775759, -3.319499529), (43.954203504, -6.6204602806))
            ThreePointArc((43.954203504, -6.6204602806), (47.0822036672, -8.7671901554), (50.8, -9.5227195084))
            Line((50.8, -9.5227195084), (50.8, 9.5272804916))
        make_face()
        with BuildLine():
            ThreePointArc((60.325, 0.0022804916), (57.5351920908, 6.7374725824), (50.8, 9.5272804916))
            Line((50.8, 9.5272804916), (50.8, -9.5227195084))
            ThreePointArc((50.8, -9.5227195084), (57.5351920908, -6.7329115992), (60.325, 0.0022804916))
        make_face()
    extrude(amount=F5_DEPTH, mode=Mode.SUBTRACT)


solid = f1.part
